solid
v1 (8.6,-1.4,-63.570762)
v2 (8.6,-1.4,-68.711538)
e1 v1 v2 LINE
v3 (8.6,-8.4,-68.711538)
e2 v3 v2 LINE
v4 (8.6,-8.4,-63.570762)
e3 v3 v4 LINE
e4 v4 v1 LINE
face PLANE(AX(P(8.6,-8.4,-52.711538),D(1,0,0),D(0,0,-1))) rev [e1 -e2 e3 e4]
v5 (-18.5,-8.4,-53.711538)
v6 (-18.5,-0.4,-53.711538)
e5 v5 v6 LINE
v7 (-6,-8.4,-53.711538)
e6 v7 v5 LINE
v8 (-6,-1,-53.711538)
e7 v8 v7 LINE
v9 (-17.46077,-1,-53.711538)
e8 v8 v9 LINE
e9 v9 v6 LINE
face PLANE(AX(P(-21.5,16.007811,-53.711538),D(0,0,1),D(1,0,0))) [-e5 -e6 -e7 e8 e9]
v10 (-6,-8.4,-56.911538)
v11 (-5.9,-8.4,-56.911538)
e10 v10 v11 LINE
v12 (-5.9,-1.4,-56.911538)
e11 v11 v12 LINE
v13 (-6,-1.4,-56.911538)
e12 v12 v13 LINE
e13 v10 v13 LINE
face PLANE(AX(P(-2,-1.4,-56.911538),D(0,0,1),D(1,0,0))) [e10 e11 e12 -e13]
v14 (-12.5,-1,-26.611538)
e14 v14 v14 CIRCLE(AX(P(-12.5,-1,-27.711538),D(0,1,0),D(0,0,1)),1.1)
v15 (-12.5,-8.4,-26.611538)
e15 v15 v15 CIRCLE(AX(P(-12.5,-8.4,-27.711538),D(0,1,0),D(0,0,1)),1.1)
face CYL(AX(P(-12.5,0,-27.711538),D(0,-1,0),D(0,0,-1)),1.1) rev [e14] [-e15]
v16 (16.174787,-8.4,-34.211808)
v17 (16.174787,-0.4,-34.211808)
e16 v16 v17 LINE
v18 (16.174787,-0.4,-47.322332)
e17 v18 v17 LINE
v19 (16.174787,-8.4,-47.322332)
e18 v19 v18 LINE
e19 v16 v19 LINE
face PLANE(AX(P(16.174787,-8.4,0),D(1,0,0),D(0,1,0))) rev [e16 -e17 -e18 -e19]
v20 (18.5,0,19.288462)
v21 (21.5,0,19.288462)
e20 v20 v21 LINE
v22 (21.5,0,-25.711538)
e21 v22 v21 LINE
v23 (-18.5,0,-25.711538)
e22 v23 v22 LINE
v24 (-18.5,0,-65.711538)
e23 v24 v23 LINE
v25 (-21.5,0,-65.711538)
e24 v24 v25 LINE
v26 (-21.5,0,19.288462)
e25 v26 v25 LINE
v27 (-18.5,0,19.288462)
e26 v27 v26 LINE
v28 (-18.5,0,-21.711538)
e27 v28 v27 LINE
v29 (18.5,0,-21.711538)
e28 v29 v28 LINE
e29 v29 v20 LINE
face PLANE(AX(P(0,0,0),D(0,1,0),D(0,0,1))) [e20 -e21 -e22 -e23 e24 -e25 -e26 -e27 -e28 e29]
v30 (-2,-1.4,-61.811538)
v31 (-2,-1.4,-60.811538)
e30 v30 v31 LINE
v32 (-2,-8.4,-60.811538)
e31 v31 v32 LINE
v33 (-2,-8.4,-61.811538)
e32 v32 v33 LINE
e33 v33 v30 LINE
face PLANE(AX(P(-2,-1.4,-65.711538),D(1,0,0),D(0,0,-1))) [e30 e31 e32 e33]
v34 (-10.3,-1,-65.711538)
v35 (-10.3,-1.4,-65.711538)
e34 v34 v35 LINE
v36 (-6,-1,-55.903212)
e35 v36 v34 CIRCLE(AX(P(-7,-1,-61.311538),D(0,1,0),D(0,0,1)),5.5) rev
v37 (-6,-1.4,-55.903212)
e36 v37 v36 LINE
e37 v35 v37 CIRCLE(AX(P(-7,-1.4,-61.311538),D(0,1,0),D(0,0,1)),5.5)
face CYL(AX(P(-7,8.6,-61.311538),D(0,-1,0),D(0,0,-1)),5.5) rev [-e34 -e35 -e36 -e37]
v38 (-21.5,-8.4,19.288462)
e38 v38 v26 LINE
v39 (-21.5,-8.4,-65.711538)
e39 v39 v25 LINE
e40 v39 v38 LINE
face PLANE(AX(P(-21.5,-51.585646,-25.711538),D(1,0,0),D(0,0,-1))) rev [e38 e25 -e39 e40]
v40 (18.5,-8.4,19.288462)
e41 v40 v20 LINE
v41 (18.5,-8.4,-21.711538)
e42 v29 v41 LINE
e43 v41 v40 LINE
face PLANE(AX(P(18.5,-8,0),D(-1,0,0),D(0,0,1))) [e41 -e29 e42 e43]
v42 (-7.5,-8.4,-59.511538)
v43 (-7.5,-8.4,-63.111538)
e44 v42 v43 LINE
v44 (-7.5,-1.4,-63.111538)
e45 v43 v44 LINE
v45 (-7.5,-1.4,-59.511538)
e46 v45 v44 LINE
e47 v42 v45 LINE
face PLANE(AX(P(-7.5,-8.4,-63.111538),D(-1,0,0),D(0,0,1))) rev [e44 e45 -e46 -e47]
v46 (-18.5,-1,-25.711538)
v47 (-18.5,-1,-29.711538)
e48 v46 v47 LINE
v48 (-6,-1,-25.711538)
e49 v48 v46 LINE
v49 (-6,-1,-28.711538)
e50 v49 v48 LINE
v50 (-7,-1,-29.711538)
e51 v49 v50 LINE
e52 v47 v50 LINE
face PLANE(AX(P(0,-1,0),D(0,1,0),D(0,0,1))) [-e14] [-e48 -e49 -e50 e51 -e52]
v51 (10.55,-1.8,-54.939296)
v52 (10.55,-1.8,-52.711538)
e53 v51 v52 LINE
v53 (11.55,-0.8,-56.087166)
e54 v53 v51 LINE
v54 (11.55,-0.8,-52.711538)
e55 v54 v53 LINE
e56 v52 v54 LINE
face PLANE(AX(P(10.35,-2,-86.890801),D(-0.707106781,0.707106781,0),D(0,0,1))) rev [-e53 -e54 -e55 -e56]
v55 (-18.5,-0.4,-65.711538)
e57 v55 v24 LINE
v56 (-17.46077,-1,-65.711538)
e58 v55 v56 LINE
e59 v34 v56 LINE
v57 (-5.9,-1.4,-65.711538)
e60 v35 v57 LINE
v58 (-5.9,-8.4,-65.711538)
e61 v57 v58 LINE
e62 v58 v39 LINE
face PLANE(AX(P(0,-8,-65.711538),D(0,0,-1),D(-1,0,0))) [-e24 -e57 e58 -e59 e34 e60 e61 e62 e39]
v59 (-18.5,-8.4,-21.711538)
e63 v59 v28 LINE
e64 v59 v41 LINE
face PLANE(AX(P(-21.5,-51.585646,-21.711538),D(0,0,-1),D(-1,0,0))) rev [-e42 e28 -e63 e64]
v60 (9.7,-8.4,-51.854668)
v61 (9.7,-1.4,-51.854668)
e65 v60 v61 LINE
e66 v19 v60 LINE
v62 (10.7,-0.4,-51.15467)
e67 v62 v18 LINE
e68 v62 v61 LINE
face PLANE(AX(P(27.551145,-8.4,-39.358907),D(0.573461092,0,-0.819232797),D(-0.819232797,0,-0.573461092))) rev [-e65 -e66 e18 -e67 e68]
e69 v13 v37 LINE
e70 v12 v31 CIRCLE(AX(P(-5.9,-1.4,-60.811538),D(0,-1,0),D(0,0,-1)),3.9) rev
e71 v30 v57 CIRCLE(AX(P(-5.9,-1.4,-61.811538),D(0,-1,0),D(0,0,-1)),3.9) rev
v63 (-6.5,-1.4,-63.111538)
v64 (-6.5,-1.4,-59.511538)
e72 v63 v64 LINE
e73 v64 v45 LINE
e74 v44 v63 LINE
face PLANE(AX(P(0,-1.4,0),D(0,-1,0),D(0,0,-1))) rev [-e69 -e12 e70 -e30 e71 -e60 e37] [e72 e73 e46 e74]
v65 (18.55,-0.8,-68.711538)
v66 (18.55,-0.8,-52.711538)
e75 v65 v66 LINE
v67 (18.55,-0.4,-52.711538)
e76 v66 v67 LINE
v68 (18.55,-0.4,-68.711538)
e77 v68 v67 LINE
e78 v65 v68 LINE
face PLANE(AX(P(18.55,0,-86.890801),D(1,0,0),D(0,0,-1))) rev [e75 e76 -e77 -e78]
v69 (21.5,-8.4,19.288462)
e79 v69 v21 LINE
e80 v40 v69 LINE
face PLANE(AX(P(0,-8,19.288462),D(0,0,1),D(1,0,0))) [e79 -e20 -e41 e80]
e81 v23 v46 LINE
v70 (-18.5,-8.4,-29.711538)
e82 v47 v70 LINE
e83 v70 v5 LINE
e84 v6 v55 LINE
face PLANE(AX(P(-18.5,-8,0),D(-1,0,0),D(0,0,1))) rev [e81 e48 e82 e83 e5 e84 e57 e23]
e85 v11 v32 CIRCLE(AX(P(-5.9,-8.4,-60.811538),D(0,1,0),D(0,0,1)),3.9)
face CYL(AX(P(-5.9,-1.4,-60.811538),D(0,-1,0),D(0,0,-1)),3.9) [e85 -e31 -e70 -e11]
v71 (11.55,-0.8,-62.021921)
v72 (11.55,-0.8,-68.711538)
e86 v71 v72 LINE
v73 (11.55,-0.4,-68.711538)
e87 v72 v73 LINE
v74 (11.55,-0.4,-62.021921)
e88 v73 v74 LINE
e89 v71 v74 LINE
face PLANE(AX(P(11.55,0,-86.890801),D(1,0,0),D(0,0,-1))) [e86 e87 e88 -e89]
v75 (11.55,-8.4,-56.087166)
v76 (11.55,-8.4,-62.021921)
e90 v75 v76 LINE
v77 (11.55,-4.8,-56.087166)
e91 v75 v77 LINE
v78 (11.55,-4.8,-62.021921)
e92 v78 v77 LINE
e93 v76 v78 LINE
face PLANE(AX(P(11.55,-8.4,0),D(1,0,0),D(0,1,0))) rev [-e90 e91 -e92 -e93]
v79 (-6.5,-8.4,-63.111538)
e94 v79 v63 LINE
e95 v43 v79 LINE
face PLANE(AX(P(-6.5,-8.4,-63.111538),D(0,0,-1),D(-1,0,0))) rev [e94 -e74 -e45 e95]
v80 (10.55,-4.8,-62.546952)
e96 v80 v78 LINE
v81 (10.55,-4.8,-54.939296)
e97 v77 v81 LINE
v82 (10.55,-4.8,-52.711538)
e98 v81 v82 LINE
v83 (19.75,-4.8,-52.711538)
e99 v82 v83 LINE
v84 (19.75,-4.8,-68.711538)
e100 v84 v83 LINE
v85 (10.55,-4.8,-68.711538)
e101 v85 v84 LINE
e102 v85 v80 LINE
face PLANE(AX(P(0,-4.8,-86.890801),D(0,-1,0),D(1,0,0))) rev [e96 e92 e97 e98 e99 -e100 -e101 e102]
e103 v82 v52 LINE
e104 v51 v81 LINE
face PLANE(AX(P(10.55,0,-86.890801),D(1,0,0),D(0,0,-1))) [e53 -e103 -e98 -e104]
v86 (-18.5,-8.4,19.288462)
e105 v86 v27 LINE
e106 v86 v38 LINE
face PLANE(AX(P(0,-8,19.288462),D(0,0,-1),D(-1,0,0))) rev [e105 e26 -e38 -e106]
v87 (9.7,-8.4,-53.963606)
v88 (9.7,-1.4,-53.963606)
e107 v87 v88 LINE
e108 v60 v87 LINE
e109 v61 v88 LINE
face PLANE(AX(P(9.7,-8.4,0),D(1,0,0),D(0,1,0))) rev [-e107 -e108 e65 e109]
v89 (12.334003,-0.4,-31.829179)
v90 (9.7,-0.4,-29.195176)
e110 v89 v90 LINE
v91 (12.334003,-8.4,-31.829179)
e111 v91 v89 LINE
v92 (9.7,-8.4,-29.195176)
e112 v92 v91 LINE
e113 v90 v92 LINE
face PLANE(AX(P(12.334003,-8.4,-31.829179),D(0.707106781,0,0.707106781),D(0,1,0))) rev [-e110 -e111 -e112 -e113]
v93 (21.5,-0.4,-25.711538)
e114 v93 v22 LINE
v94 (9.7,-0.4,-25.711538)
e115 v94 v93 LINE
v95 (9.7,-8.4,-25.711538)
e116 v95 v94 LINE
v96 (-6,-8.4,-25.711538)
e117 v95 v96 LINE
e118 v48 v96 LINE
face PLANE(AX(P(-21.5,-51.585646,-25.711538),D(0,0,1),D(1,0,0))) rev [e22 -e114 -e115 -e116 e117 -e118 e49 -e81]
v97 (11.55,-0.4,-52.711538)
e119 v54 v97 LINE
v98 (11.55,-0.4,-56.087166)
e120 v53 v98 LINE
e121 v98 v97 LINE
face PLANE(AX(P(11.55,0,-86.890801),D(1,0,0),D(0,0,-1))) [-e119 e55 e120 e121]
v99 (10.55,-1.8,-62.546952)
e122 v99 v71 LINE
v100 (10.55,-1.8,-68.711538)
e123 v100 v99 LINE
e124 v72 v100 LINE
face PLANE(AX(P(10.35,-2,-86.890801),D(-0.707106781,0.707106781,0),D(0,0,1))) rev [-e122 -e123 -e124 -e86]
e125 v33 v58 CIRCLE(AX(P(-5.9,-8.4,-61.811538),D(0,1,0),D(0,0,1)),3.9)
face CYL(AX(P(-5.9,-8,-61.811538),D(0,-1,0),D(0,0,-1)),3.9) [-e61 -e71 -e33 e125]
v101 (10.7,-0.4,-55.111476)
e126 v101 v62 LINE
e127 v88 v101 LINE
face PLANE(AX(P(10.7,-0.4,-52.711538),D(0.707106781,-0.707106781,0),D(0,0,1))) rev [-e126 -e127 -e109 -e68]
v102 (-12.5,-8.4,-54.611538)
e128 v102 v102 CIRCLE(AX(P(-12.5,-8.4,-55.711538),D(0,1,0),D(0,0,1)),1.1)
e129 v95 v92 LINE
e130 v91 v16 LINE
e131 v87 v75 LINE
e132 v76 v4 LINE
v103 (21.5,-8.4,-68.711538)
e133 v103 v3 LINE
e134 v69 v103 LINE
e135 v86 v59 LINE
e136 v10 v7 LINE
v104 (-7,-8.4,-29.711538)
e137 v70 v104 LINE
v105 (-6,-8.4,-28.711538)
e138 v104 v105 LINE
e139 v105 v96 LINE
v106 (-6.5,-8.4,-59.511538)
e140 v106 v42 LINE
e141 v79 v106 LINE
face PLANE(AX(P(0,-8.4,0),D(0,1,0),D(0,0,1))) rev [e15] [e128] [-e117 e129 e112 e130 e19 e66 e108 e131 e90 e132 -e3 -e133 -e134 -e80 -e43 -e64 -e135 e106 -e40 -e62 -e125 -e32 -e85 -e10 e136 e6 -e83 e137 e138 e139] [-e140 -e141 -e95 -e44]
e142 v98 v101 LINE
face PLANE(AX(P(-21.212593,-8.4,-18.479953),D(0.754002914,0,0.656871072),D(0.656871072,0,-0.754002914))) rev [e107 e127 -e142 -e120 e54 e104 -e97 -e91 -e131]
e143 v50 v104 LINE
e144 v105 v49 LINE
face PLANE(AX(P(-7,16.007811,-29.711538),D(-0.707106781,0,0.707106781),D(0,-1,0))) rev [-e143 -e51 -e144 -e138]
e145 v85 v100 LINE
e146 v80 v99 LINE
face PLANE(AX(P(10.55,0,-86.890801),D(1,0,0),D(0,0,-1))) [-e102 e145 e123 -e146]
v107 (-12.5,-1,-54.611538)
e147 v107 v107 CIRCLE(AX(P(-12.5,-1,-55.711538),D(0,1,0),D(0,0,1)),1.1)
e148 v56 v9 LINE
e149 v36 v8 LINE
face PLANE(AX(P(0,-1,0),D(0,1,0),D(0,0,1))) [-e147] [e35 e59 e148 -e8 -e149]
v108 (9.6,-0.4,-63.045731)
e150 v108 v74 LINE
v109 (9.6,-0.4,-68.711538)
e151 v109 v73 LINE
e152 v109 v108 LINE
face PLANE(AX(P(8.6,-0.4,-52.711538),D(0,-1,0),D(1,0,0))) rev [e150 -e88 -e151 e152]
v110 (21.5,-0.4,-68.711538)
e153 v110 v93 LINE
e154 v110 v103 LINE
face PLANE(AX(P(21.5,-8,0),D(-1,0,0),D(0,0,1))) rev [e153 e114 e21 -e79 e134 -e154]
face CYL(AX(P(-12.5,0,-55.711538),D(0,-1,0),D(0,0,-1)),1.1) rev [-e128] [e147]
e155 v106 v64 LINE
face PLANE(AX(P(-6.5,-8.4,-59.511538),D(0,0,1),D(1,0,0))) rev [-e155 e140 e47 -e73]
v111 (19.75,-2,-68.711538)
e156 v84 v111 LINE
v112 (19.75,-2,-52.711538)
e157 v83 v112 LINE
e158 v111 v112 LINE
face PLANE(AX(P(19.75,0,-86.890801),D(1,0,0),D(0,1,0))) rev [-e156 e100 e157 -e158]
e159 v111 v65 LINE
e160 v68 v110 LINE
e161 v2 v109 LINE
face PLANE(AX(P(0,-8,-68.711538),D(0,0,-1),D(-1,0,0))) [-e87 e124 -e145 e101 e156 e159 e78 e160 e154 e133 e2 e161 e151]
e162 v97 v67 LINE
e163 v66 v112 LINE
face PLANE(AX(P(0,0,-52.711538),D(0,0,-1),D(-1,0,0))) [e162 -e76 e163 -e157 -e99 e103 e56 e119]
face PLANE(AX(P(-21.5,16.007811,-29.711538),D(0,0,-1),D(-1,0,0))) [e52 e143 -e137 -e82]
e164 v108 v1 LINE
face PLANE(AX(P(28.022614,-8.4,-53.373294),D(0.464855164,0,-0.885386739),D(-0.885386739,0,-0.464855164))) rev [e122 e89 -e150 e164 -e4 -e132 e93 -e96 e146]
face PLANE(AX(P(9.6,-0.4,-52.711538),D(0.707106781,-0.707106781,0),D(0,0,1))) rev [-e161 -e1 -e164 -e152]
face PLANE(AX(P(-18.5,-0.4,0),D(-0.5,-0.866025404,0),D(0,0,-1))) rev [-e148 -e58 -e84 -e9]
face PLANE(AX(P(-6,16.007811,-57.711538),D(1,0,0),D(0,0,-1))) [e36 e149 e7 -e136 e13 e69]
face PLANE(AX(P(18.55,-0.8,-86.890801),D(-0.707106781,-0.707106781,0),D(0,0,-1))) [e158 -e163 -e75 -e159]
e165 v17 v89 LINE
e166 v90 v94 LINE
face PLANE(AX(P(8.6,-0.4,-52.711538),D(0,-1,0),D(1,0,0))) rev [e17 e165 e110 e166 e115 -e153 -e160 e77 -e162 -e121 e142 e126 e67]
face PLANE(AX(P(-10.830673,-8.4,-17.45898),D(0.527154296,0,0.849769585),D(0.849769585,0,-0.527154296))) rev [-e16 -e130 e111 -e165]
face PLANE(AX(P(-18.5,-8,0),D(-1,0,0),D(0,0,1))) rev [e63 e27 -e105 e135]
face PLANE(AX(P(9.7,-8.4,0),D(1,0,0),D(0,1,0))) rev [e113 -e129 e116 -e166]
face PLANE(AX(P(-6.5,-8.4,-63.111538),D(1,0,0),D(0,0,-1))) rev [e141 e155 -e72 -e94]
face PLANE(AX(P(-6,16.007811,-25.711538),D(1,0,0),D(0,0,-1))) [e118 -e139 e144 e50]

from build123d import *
from OCP.BRepFilletAPI import BRepFilletAPI_MakeChamfer

# Parameters (mm, degrees)
SKETCH1_W                       = 3
SKETCH1_H                       = 37
SKETCH1_H_2                     = 48
BOSS_EXTRUDE1_DEPTH             = 8
SKETCH4_W                       = 19.5
SKETCH4_H                       = 8.8
BOSS_EXTRUDE3_DEPTH             = 6.6
SERVO_HOLDER_DEPTH              = 0.4
SERVO_HOLDER_DEPTH_BACK         = 7
SKETCH3_W                       = 15.5
SKETCH3_H                       = 4
SKETCH3_R                       = 1.04
SKETCH5_W                       = 1
SKETCH5_H                       = 3.6
CUT_EXTRUDE2_DEPTH              = 70.647801738
SKETCH11_W                      = 43
SKETCH11_H                      = 4
BOSS_EXTRUDE9_DEPTH             = 8
BOSS_EXTRUDE9_DIRECTION_2_REACH = 71.601
SKETCH14_W                      = 12.223643904
SKETCH14_H                      = 44.979564252
CUT_EXTRUDE5_DEPTH              = 10
FILLET2_R                       = 3.9
CUT_EXTRUDE4_DEPTH              = 70.647801738
CUT_EXTRUDE4_DEPTH_BACK         = 70.647801738
SKETCH13_R                      = 1.1
SKETCH17_W                      = 12.9
SKETCH17_H                      = 8
BOSS_EXTRUDE11_DEPTH            = 27
BOSS_EXTRUDE12_DEPTH            = 16
SKETCH18_W                      = 1
SKETCH18_H                      = 3.6
SKETCH18_W_2                    = 3
SKETCH18_H_2                    = 24
SKETCH18_H_3                    = 41
BOSS_EXTRUDE13_DEPTH            = 0.4
CHAMFER14_SIZE                  = 1.2
CUT_EXTRUDE6_DEPTH              = 73.439806169
CUT_EXTRUDE6_DEPTH_BACK         = 73.439806169
SKETCH29_W                      = 8.885937164
SKETCH29_H                      = 8
BOSS_EXTRUDE20_DEPTH            = 0.4
CHAMFER23_SIZE                  = 1
CHAMFER24_SIZE                  = 1
CHAMFER24_SIZE2                 = 3.099667104
SKETCH26_R                      = 5.5
CUT_EXTRUDE8_DEPTH              = 10
CHAMFER25_SIZE                  = 0.6
CHAMFER25_SIZE2                 = 1.039230485


with BuildPart() as part:
    # Sketch1 → Boss-Extrude1 (new body)
    with BuildSketch(Plane(origin=(0, 0, 0), x_dir=(1, 0, 0), z_dir=(0, 1, 0))):
        with Locations((-20, -0.788461538)):
            Rectangle(SKETCH1_W, SKETCH1_H)
        with Locations((-20, 41.711538462)):
            Rectangle(SKETCH1_W, SKETCH1_H_2)
        with Locations((20, -0.788461538)):
            Rectangle(SKETCH1_W, SKETCH1_H)
        with Locations((20, 41.711538462)):
            Rectangle(SKETCH1_W, SKETCH1_H_2)
    extrude(amount=-BOSS_EXTRUDE1_DEPTH)

    # Sketch4 → Boss-Extrude3 (add)
    with BuildSketch(Plane.XZ.offset(8)):
        with Locations((-11.75, -61.311538462)):
            Rectangle(SKETCH4_W, SKETCH4_H)
    extrude(amount=-BOSS_EXTRUDE3_DEPTH)

    # Sketch3 → Servo Holder (add, two sides: drawn at the far end of the back side and taken through both)
    # profile 1 of 2: a face of its own
    with BuildSketch(Plane.XZ.offset(8).offset(-SERVO_HOLDER_DEPTH_BACK)):
        with Locations((-13.75, -55.711538462)):
            Rectangle(SKETCH3_W, SKETCH3_H)
        with Locations(Location((-12.5, -55.711538462, 0), (0, 0, 270))):
            Circle(SKETCH3_R, mode=Mode.SUBTRACT)
    # profile 2 of 2: a face of its own
    with BuildSketch(Plane.XZ.offset(8).offset(-SERVO_HOLDER_DEPTH_BACK)):
        with Locations((-13.75, -27.711538462)):
            Rectangle(SKETCH3_W, SKETCH3_H)
        with Locations(Location((-12.5, -27.711538462, 0), (0, 0, 90))):
            Circle(SKETCH3_R, mode=Mode.SUBTRACT)
    extrude(amount=SERVO_HOLDER_DEPTH + SERVO_HOLDER_DEPTH_BACK)

    # Sketch5 → Cut-Extrude2 (cut, through all)
    with BuildSketch(Plane(origin=(0, 0, 0), x_dir=(1, 0, 0), z_dir=(0, 1, 0))):
        with Locations((-7, 61.311538462)):
            Rectangle(SKETCH5_W, SKETCH5_H)
    extrude(amount=-CUT_EXTRUDE2_DEPTH, mode=Mode.SUBTRACT)

    # Sketch11 → Boss-Extrude9 (add)
    with BuildSketch(Plane.XZ.offset(8)):
        with Locations((0, -23.711538462)):
            Rectangle(SKETCH11_W, SKETCH11_H)
    extrude(amount=-BOSS_EXTRUDE9_DEPTH)

    # Boss-Extrude9 direction 2: up to this face of the body (flat: up to its plane)
    boss_extrude9_direction_2_end = Plane(part.part.faces().sort_by_distance((-13.822479257, -8.4, -55.711538462))[0])
    # Sketch11 → Boss-Extrude9 direction 2 (add, up to the picked face)
    with BuildSketch(Plane.XZ.offset(8), mode=Mode.PRIVATE) as boss_extrude9_direction_2_sk1:
        with Locations((0, -23.711538462)):
            Rectangle(SKETCH11_W, SKETCH11_H)
    boss_extrude9_direction_2_tool1 = split(extrude(boss_extrude9_direction_2_sk1.sketch, amount=BOSS_EXTRUDE9_DIRECTION_2_REACH, mode=Mode.PRIVATE), bisect_by=boss_extrude9_direction_2_end, keep=Keep.BOTH, mode=Mode.PRIVATE)
    add(boss_extrude9_direction_2_tool1.solids().sort_by(Axis((0, -8, -23.711538), (0, -1, 0)))[0])

    # Sketch14 → Cut-Extrude5 (cut)
    with BuildSketch(Plane.XZ.offset(8)):
        with Locations((24.611821952, -48.201320588)):
            Rectangle(SKETCH14_W, SKETCH14_H)
    extrude(amount=-CUT_EXTRUDE5_DEPTH, mode=Mode.SUBTRACT)

    # Fillet2
    fillet2_edges = [part.edges().sort_by_distance(p)[0] for p in [
        (-2, -4.7, -65.711538462),
        (-2, -4.7, -56.911538462),
    ]]
    fillet(fillet2_edges, radius=FILLET2_R)

    # Sketch13 → Cut-Extrude4 (cut, two sides: drawn at the far end of the back side and taken through both)
    with BuildSketch(Plane(origin=(0, -8.4, 0), x_dir=(-1, 0, 0), z_dir=(0, -1, 0)).offset(-CUT_EXTRUDE4_DEPTH_BACK)):
        with Locations(Location((12.5, 55.711538462, 0), (0, 0, 270))):
            Circle(SKETCH13_R)
        with Locations(Location((12.5, 27.711538462, 0), (0, 0, 270))):
            Circle(SKETCH13_R)
    extrude(amount=CUT_EXTRUDE4_DEPTH + CUT_EXTRUDE4_DEPTH_BACK, mode=Mode.SUBTRACT)

    # Sketch17 → Boss-Extrude11 (add)
    with BuildSketch(Plane(origin=(0, 0, -25.711538462), x_dir=(-1, 0, 0), z_dir=(0, 0, -1))):
        with Locations((-15.05, -4.4)):
            Rectangle(SKETCH17_W, SKETCH17_H)
    extrude(amount=BOSS_EXTRUDE11_DEPTH)

    # Sketch16 → Boss-Extrude12 (add)
    with BuildSketch(Plane(origin=(0, 0, -52.711538462), x_dir=(-1, 0, 0), z_dir=(0, 0, -1))):
        Polygon((-19.75, -2), (-18.55, -2), (-18.55, -0.4), (-21.5, -0.4), (-21.5, -8.4), (-8.6, -8.4), (-8.6, -0.4), (-11.55, -0.4), (-11.55, -2), (-10.55, -2), (-10.55, -4.8), (-19.75, -4.8), align=None)
    extrude(amount=BOSS_EXTRUDE12_DEPTH)

    # Sketch18 → Boss-Extrude13 (add)
    # profile 1 of 4: a face of its own
    with BuildSketch(Plane.XZ.offset(8)):
        with BuildLine():
            Line((-21.5, -57.711538462), (-21.5, -65.711538462))
            Line((-21.5, -65.711538462), (-5.9, -65.711538462))
            ThreePointArc((-5.9, -65.711538462), (-3.142283553, -64.569254908), (-2, -61.811538462))
            Line((-2, -61.811538462), (-2, -60.811538462))
            ThreePointArc((-2, -60.811538462), (-3.142283553, -58.053822015), (-5.9, -56.911538462))
            Line((-5.9, -56.911538462), (-6, -56.911538462))
            Line((-6, -56.911538462), (-6, -57.711538462))
            Line((-6, -57.711538462), (-21.5, -57.711538462))
        make_face()
        with Locations((-7, -61.311538462)):
            Rectangle(SKETCH18_W, SKETCH18_H, mode=Mode.SUBTRACT)
    # profile 2 of 4: a face of its own
    with BuildSketch(Plane.XZ.offset(8)):
        with Locations((-20, -41.711538462)):
            Rectangle(SKETCH18_W_2, SKETCH18_H_2)
    # profile 3 of 4: a face of its own
    with BuildSketch(Plane.XZ.offset(8)):
        with Locations((-20, -1.211538462)):
            Rectangle(SKETCH18_W_2, SKETCH18_H_3)
    # profile 4 of 4: a face of its own
    with BuildSketch(Plane.XZ.offset(8)):
        with Locations((20, -1.211538462)):
            Rectangle(SKETCH18_W_2, SKETCH18_H_3)
    extrude(amount=BOSS_EXTRUDE13_DEPTH)

    # Chamfer14
    # the kernel refuses this chamfer: 1.2 mm, written as the material it takes off along each edge
    with BuildSketch(Plane(origin=(18.55, -2, -52.711538462), x_dir=(0.9996219169112968, -0.027495876610586622, 0), z_dir=(0, 0, -1))) as chamfer14_piece_1_section:
        Polygon((CHAMFER14_SIZE * 0.999621916911, -CHAMFER14_SIZE * 0.0274958766106), (-CHAMFER14_SIZE * 0.0274958766106, -CHAMFER14_SIZE * 0.999621916911), (0, 0), align=None)
    chamfer14_piece_1 = extrude(amount=19.086019586, mode=Mode.PRIVATE)
    chamfer14_piece_1 = split(chamfer14_piece_1, bisect_by=Plane(origin=(19.75, -1.603515015, -62.254548254), z_dir=(-1, 0, 0)), keep=Keep.TOP, mode=Mode.PRIVATE)
    add(chamfer14_piece_1, mode=Mode.SUBTRACT)
    with BuildSketch(Plane(origin=(11.55, -2, -52.711538462), x_dir=(0.027495876610585914, 0.9996219169112968, 0), z_dir=(0, 0, -1))) as chamfer14_piece_2_section:
        Polygon((CHAMFER14_SIZE * 0.999621916911, -CHAMFER14_SIZE * 0.0274958766106), (-CHAMFER14_SIZE * 0.0274958766106, -CHAMFER14_SIZE * 0.999621916911), (0, 0), align=None)
    chamfer14_piece_2 = extrude(amount=19.086019586, mode=Mode.PRIVATE)
    chamfer14_piece_2 = split(chamfer14_piece_2, bisect_by=Plane(origin=(10.55, -1.589568171, -62.254548254), z_dir=(1, 0, 0)), keep=Keep.TOP, mode=Mode.PRIVATE)
    add(chamfer14_piece_2, mode=Mode.SUBTRACT)

    # Sketch20 → Cut-Extrude6 (cut, two sides: drawn at the far end of the back side and taken through both)
    with BuildSketch(Plane(origin=(0, -0.4, 0), x_dir=(1, 0, 0), z_dir=(0, 1, 0)).offset(-CUT_EXTRUDE6_DEPTH_BACK)):
        Polygon((8.6, 53.963605621), (8.6, 63.570761525), (2.515498959, 66.765310983), (1.997773223, 58.659131413), (1.997773223, 53.963605621), (4.974693998, 53.963605621), (4.974693998, 55.162371456), (6.687222193, 53.963605621), align=None)
        Polygon((8.6, 52.700948092), (8.6, 53.963605621), (6.687222193, 53.963605621), (8.558718605, 52.653562397), align=None)
        Polygon((16.174786864, 47.322331969), (9.7, 51.854668021), (9.7, 30.195176122), (16.174786864, 34.211808124), align=None)
        Polygon((4.974693998, 53.963605621), (6.687222193, 53.963605621), (4.974693998, 55.162371456), align=None)
        Polygon((11.55, 56.087166011), (11.55, 62.021921145), (8.6, 63.570761525), (8.6, 53.963605621), (9.7, 53.963605621), align=None)
        Polygon((8.6, 52.624665515), (8.6, 52.700948092), (8.558718605, 52.653562397), align=None)
        Polygon((9.7, 25.711538462), (9.7, 30.195176122), (8.6, 29.512791467), (8.6, 25.711538462), align=None)
        Polygon((9.7, 53.963605621), (8.6, 53.963605621), (8.6, 52.700948092), align=None)
        Polygon((9.7, 51.854668021), (9.7, 53.963605621), (8.6, 52.700948092), (8.6, 52.624665515), align=None)
        Polygon((8.558718605, 52.653562397), (6.687222193, 53.963605621), (4.974693998, 53.963605621), (4.974693998, 48.539566347), align=None)
        Polygon((9.7, 30.195176122), (9.7, 51.854668021), (8.6, 52.624665515), (8.6, 29.512791467), align=None)
        Polygon((8.6, 52.624665515), (8.558718605, 52.653562397), (4.974693998, 48.539566347), (4.974693998, 27.263834025), (8.6, 29.512791467), align=None)
    extrude(amount=CUT_EXTRUDE6_DEPTH + CUT_EXTRUDE6_DEPTH_BACK, mode=Mode.SUBTRACT)

    # Sketch29 → Boss-Extrude20 (add)
    with BuildSketch(Plane(origin=(0, -1.4, 0), x_dir=(1, 0, 0), z_dir=(0, 1, 0))):
        with Locations((-14.057031418, 61.711538462)):
            Rectangle(SKETCH29_W, SKETCH29_H)
    extrude(amount=BOSS_EXTRUDE20_DEPTH)

    # Chamfer23
    chamfer23_edges = [part.edges().sort_by_distance(p)[0] for p in [
        (9.7, -0.4, -52.909136821),
    ]]
    chamfer(chamfer23_edges, length=CHAMFER23_SIZE)

    # Chamfer24: one chamfer whose edges measure the first distance from different faces: ONE call of the kernel's chamfer builder (chamfer() names one face for all edges)
    chamfer24_edges_1 = [part.edges().sort_by_distance(p)[0] for p in [
        (8.6, -0.4, -66.141149993),
        (-6, -4.7, -29.711538462),
    ]]
    chamfer24_edges_2 = [part.edges().sort_by_distance(p)[0] for p in [
        (9.7, -4.4, -30.195176122),
    ]]
    chamfer24_side_2 = [part.faces().sort_by_distance(p)[0] for p in [
        (9.7, -4.4, -27.953357292),
    ]]
    chamfer24 = BRepFilletAPI_MakeChamfer(part.part.solid().wrapped)
    for e in chamfer24_edges_1:
        chamfer24.Add(CHAMFER24_SIZE, e.wrapped)
    for e in chamfer24_edges_2:
        chamfer24.Add(CHAMFER24_SIZE, CHAMFER24_SIZE2, e.wrapped, chamfer24_side_2[0].wrapped)  # the first distance lies on this face
    add(Compound.cast(chamfer24.Shape()), mode=Mode.REPLACE)

    # Sketch26 → Cut-Extrude8 (cut)
    with BuildSketch(Plane(origin=(0, -1.4, 0), x_dir=(1, 0, 0), z_dir=(0, 1, 0))):
        with Locations((-7, 61.311538462)):
            Circle(SKETCH26_R)
    extrude(amount=CUT_EXTRUDE8_DEPTH, mode=Mode.SUBTRACT)

    # Chamfer25
    chamfer25_edges = [part.edges().sort_by_distance(p)[0] for p in [
        (-18.5, -1, -59.711538462),
    ]]
    chamfer25_side = [part.faces().sort_by_distance(p)[0] for p in [
        (-18.5, -3.927941176, -42.446832579),
    ]]
    chamfer(chamfer25_edges, length=CHAMFER25_SIZE, length2=CHAMFER25_SIZE2, reference=chamfer25_side[0])


solid = part.part
